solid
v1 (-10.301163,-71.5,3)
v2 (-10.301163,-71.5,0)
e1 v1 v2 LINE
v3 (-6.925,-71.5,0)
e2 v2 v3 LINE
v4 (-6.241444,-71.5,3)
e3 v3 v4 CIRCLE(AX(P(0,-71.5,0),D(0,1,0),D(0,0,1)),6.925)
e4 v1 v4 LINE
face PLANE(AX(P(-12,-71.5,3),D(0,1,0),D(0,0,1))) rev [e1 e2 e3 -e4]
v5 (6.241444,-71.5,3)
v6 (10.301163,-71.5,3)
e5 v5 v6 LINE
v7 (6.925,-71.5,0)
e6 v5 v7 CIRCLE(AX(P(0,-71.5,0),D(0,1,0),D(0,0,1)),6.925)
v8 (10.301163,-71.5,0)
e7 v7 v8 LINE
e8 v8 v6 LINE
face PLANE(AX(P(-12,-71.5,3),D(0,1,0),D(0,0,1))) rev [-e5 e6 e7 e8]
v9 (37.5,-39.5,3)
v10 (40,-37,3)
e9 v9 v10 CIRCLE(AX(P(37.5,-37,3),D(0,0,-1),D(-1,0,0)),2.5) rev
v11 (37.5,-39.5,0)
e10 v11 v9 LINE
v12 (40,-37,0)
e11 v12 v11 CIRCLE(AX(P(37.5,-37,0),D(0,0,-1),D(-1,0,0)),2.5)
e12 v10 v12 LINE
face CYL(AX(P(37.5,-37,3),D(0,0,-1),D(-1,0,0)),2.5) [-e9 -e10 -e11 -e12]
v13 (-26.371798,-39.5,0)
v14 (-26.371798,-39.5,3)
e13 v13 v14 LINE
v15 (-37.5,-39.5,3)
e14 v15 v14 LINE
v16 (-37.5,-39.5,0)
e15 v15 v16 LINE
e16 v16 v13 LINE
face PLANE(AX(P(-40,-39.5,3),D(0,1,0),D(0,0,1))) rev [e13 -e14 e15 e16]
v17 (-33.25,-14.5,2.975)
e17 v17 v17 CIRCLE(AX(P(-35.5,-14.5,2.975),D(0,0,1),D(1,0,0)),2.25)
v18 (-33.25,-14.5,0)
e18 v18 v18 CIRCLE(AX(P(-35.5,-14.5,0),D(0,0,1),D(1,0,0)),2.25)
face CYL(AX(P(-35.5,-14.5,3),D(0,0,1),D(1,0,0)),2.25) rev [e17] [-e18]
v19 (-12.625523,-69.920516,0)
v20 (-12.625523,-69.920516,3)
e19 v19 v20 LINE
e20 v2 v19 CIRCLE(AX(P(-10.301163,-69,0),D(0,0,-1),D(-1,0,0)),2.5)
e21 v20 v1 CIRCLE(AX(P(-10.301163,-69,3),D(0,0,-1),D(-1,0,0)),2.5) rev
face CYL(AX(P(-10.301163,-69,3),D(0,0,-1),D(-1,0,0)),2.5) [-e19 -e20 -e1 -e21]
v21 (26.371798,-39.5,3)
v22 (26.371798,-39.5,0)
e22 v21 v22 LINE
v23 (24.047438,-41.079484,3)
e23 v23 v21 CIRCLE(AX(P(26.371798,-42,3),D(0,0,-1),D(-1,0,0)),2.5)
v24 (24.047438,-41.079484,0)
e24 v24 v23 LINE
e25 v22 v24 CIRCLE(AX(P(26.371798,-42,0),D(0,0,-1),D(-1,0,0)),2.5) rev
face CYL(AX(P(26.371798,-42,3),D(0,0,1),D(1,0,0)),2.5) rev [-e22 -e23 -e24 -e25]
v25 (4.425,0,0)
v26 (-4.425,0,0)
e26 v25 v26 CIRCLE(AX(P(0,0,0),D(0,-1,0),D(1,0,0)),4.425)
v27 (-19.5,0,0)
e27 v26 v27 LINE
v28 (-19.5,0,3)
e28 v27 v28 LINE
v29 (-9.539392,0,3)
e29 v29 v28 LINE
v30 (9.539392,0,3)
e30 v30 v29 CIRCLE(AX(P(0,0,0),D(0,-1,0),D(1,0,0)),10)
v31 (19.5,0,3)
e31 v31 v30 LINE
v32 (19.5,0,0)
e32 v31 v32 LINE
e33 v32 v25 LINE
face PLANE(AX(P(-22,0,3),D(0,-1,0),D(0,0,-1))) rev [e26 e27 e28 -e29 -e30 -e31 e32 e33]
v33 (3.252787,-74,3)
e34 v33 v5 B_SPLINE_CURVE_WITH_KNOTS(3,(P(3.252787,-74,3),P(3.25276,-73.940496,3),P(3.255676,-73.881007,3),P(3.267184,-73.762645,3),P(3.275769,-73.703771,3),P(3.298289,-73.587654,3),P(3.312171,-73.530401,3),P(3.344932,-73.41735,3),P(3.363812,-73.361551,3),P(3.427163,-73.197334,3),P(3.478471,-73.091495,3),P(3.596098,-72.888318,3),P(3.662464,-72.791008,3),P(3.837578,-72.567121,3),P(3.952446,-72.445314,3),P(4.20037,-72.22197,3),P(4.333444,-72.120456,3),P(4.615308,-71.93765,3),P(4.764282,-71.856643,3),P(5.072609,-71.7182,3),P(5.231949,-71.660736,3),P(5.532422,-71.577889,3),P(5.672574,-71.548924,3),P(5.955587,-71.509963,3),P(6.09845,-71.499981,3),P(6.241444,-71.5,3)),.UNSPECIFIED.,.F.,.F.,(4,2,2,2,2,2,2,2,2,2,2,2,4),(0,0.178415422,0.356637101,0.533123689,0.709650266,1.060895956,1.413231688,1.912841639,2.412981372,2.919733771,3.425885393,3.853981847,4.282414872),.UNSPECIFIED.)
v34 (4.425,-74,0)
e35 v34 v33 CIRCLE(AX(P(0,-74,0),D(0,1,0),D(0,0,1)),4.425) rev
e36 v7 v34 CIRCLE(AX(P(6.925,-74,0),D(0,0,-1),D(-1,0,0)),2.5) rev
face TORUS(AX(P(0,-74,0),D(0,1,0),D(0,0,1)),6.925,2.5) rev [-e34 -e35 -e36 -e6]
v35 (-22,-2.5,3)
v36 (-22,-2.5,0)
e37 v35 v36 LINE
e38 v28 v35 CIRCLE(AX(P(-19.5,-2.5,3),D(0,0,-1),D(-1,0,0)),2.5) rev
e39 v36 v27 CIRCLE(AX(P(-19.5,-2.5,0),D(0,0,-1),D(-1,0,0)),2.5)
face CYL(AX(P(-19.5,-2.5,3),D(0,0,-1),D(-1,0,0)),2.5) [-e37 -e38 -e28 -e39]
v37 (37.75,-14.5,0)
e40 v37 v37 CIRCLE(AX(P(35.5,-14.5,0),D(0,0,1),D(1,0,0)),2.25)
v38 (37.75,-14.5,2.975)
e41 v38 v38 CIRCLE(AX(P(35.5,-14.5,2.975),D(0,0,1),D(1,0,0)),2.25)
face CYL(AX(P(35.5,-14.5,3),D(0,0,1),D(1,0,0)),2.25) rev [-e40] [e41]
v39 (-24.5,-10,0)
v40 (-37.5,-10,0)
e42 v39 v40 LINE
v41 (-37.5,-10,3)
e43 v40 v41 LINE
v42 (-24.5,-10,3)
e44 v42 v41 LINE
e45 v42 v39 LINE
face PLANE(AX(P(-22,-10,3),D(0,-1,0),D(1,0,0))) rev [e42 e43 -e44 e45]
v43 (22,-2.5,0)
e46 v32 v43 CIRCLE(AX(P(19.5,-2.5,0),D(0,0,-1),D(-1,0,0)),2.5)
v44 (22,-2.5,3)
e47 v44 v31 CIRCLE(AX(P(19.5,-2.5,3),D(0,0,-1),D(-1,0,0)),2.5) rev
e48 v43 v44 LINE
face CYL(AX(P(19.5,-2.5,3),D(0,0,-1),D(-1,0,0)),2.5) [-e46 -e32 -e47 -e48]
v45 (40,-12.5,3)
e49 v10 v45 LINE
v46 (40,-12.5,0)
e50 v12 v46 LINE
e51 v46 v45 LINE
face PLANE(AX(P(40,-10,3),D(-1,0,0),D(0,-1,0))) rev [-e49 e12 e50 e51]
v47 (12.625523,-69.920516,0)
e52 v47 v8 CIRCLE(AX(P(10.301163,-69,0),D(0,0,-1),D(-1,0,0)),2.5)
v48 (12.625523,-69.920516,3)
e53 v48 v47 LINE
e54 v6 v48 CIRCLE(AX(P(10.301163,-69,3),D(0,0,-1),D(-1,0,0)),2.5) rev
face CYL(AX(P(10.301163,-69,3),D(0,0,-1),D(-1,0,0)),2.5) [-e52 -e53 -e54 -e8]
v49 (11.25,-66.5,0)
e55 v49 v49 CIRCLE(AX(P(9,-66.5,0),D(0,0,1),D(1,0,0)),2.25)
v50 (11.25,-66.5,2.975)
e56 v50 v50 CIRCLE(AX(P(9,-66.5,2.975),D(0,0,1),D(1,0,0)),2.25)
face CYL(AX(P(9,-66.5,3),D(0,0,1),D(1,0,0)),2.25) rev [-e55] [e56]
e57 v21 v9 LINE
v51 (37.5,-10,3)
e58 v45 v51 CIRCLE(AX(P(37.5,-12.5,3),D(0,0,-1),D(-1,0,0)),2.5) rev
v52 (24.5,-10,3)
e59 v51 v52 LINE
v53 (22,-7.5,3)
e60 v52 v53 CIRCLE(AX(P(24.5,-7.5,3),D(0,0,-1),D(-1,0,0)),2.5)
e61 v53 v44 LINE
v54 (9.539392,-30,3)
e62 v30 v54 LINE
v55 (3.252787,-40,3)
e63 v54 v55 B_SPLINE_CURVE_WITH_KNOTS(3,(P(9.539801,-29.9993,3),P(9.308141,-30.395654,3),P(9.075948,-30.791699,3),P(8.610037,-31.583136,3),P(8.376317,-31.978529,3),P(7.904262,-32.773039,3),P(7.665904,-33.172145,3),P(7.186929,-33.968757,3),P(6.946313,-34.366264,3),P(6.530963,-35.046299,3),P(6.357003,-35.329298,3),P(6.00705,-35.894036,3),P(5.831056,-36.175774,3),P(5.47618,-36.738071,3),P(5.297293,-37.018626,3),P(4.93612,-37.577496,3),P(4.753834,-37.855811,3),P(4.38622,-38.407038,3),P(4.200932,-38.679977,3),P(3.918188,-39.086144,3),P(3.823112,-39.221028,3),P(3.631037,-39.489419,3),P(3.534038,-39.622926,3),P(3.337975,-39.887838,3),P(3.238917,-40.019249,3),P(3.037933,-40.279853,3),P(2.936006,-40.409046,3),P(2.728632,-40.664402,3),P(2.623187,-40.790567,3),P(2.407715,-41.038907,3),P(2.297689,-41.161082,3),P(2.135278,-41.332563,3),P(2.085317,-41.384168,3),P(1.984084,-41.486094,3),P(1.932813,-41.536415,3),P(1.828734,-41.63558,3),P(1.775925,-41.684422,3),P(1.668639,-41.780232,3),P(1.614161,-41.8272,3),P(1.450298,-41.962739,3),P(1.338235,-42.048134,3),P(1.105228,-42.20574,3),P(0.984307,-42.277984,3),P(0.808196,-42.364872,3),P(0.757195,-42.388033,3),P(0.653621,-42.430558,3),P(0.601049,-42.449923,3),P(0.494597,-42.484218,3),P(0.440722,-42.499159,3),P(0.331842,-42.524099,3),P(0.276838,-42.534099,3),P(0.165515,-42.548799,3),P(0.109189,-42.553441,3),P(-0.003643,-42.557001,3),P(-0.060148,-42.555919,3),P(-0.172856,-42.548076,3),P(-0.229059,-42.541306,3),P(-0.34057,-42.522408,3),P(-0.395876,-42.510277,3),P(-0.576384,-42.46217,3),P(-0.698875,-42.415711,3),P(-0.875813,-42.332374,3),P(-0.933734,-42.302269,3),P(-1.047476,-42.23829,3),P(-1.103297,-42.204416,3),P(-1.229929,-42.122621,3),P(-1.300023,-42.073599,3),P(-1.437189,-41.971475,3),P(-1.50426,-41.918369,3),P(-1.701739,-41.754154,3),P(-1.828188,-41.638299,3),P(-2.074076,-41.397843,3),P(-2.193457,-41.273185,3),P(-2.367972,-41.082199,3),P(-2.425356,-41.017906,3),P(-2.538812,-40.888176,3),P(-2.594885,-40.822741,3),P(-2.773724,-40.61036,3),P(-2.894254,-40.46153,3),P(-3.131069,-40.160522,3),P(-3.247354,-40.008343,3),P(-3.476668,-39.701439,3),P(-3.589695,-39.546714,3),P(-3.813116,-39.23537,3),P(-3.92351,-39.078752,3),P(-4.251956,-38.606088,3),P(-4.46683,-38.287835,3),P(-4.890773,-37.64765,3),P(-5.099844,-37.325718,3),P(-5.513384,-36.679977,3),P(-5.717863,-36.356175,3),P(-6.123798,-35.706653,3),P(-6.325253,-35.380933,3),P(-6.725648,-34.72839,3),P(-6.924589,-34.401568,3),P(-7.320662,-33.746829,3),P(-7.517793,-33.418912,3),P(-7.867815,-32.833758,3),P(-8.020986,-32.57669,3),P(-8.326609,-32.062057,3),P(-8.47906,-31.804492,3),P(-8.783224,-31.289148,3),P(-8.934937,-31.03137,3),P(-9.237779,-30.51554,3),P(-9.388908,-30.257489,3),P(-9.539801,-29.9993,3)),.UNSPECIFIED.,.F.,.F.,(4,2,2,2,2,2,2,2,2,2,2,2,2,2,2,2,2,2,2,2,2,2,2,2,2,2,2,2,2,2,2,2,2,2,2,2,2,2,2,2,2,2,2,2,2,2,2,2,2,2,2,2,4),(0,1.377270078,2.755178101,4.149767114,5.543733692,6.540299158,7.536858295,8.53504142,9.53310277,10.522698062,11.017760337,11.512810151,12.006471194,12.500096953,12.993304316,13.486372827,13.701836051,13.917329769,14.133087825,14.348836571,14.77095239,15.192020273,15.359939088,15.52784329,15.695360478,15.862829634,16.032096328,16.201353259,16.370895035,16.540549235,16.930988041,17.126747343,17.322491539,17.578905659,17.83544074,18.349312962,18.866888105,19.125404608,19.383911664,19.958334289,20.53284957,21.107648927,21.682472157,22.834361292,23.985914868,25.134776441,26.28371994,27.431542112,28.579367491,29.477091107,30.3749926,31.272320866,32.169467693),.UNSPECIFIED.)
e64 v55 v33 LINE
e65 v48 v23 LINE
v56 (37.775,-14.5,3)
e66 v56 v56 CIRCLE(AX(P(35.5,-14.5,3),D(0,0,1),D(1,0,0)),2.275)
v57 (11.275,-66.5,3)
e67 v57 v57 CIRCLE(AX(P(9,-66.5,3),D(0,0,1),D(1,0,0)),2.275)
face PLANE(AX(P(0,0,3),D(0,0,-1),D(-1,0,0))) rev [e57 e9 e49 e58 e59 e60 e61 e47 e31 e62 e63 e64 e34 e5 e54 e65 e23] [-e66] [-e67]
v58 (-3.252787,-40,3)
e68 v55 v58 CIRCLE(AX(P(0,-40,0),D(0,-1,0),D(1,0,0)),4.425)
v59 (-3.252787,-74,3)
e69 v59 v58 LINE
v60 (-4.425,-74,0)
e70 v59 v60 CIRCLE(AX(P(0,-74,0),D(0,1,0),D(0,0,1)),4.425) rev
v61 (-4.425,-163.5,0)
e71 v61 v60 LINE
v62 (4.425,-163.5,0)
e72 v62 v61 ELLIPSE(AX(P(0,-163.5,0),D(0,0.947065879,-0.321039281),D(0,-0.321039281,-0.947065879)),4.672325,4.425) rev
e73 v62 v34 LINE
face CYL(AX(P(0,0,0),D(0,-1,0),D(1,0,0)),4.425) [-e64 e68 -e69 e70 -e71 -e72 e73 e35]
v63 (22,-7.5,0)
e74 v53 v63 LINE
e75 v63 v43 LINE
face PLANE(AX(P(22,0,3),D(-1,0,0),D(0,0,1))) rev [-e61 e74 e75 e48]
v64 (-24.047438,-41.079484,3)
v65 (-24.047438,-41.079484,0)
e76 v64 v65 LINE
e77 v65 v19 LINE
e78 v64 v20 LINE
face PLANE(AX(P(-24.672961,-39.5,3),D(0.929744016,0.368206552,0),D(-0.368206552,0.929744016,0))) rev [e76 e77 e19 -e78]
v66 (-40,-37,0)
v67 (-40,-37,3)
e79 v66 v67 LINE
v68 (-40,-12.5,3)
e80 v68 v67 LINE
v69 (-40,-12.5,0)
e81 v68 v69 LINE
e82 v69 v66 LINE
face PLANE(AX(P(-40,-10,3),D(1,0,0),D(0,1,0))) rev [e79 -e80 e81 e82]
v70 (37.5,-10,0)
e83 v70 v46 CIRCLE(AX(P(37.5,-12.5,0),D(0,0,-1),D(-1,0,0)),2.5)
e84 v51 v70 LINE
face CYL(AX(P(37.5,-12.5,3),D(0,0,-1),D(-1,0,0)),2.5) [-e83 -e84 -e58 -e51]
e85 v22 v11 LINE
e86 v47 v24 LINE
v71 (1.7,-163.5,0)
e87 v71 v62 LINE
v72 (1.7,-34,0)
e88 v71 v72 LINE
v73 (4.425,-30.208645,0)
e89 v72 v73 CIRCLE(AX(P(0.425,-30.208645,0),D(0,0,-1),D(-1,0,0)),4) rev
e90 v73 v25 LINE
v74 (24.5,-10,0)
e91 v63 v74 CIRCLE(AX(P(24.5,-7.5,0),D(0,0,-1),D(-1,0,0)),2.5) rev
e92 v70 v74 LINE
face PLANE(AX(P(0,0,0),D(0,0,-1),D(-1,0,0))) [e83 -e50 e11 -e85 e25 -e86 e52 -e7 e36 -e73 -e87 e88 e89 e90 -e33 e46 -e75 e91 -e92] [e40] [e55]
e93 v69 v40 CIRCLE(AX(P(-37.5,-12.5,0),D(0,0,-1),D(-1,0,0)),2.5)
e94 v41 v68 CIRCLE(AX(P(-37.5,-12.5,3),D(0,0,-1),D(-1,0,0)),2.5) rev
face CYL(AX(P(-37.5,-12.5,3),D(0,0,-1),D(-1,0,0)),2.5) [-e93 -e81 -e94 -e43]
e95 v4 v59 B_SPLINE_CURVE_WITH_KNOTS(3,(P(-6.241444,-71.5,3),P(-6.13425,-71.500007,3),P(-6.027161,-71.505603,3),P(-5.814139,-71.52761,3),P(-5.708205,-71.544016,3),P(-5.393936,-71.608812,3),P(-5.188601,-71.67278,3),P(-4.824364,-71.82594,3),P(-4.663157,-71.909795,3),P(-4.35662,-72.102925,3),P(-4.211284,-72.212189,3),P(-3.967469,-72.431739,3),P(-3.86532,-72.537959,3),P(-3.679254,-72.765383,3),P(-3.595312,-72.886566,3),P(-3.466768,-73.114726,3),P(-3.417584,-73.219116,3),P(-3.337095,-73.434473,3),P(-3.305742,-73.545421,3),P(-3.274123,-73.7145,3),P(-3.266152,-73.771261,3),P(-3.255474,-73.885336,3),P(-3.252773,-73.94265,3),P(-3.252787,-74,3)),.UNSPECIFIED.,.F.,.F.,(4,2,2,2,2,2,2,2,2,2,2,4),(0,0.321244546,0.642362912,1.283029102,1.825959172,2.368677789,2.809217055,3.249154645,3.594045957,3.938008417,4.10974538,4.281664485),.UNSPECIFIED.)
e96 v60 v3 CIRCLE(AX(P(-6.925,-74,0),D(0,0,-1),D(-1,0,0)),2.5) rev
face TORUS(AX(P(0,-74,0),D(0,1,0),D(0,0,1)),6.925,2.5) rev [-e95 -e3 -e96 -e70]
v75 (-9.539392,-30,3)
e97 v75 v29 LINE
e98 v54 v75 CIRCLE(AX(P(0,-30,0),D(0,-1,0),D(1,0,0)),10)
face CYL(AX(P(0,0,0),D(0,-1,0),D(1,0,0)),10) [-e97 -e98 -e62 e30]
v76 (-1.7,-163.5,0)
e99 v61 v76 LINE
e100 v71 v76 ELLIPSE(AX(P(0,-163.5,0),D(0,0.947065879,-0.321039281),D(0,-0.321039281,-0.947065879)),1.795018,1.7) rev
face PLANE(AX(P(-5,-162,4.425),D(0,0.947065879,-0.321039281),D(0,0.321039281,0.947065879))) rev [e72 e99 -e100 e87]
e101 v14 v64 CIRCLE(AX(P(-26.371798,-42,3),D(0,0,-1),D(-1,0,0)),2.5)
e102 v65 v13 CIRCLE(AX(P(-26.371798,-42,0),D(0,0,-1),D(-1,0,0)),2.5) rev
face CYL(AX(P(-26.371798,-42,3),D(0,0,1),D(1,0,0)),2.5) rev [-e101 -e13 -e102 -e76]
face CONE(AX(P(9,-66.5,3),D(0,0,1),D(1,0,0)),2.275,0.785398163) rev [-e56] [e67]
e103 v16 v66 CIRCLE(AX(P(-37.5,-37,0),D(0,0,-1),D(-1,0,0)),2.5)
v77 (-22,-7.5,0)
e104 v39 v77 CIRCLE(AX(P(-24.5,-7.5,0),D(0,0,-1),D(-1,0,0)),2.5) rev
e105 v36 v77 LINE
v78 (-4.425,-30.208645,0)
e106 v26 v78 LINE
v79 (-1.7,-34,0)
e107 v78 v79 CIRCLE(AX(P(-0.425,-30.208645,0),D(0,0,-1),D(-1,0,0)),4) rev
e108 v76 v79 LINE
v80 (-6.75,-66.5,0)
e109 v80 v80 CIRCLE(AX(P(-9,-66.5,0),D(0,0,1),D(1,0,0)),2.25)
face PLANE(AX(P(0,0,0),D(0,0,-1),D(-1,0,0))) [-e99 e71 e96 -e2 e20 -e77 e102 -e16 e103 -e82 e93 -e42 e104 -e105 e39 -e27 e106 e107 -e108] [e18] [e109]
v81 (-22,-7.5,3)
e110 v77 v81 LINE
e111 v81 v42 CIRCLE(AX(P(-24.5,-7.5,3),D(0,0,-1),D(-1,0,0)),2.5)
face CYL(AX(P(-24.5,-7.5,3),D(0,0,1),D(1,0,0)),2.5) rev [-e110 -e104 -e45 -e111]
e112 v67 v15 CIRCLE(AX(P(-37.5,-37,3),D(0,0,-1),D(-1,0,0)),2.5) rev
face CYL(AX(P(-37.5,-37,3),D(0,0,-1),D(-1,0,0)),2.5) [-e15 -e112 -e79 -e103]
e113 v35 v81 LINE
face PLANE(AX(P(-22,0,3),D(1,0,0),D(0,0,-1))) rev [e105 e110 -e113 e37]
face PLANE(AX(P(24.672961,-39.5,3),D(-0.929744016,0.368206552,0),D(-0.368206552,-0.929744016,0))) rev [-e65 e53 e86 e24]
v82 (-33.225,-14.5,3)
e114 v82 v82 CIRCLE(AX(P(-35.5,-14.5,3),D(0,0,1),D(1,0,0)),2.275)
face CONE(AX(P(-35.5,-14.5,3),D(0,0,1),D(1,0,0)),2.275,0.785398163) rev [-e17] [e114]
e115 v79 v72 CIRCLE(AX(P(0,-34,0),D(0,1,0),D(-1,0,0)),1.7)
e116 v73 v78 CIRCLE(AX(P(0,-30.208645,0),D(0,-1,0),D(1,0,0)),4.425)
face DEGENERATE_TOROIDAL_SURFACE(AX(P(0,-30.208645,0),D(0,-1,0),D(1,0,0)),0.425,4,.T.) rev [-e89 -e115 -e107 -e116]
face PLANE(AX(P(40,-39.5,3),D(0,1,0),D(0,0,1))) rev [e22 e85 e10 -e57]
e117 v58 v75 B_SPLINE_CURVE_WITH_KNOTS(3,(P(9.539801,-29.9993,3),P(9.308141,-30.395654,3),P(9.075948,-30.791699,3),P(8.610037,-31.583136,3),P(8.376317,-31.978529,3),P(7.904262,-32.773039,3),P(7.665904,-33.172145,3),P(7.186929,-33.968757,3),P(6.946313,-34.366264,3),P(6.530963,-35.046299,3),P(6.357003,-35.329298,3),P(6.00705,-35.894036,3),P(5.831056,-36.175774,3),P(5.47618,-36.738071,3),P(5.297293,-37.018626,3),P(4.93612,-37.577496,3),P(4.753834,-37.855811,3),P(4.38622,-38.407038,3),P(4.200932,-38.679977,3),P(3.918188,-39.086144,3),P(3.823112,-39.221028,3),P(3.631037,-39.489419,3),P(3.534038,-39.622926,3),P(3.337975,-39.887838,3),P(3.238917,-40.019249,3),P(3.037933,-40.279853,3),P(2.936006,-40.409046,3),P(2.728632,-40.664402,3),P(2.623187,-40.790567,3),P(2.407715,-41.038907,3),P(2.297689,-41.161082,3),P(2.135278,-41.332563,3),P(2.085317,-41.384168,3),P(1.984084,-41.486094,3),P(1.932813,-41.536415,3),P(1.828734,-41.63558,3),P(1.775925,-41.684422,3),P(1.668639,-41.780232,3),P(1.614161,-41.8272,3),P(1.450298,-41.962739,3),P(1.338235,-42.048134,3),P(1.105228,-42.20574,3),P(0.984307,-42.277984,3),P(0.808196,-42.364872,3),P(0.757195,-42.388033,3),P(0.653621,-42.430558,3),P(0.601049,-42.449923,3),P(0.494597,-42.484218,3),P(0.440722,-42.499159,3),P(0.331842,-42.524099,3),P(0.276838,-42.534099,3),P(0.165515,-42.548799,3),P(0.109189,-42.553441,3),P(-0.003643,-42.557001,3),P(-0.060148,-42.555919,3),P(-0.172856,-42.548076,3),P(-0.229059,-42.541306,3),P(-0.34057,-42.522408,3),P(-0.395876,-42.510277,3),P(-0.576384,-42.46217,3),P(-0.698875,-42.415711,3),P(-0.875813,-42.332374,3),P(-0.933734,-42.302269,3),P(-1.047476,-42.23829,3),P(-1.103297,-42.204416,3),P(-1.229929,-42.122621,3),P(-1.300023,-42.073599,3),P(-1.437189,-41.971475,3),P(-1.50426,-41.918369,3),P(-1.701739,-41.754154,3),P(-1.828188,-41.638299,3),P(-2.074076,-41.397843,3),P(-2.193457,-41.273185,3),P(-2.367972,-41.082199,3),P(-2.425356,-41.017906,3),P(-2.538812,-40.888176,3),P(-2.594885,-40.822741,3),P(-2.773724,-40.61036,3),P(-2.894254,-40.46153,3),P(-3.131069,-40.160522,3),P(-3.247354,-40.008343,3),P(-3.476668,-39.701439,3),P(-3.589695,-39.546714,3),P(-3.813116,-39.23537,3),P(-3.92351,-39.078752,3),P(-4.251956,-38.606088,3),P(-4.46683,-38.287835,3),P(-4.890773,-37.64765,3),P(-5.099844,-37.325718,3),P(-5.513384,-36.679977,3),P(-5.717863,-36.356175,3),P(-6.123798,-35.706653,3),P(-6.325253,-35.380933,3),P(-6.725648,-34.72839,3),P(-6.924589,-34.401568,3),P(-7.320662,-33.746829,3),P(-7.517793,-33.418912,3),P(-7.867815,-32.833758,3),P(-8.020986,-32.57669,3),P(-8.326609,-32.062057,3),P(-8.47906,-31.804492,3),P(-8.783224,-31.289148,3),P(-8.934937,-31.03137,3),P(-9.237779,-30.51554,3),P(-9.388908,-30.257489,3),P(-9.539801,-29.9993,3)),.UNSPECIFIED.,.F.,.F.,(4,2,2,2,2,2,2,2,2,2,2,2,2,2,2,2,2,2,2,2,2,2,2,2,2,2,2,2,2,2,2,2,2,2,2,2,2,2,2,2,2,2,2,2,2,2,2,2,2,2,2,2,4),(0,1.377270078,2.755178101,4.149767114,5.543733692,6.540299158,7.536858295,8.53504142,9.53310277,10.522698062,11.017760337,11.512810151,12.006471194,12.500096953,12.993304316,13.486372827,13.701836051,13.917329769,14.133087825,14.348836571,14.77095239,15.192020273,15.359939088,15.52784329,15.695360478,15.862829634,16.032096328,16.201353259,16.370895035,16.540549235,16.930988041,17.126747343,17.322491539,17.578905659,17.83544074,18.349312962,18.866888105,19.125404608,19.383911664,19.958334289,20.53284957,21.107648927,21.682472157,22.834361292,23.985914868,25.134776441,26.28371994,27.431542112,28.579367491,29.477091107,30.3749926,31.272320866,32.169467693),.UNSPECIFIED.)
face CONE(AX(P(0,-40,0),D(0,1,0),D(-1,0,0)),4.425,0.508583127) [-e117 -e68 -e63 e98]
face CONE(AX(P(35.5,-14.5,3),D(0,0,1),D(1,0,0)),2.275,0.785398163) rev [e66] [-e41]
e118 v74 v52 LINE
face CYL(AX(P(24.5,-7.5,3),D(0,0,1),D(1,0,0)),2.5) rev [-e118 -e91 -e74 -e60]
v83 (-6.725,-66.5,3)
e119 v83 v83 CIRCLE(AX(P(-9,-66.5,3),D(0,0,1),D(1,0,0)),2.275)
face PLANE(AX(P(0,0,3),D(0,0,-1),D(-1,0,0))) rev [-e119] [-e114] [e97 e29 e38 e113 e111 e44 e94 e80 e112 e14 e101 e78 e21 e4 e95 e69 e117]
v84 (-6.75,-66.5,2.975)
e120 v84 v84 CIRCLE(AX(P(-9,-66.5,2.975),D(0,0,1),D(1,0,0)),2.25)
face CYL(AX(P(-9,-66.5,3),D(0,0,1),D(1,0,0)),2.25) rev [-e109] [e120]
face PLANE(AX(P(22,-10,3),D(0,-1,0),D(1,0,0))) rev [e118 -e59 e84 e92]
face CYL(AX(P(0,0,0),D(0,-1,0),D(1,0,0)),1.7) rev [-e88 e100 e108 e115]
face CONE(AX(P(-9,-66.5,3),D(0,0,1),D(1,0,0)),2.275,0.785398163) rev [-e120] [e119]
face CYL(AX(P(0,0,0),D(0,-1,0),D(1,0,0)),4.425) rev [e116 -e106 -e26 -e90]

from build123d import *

# Parameters (mm, degrees)
BOSS_EXTRUDE1_DEPTH            = 3
SKETCH2_W                      = 2.725
SKETCH2_H                      = 93.5
REVOLVE1_ANGLE                 = 180
SKETCH2_3_W                    = 1.7
SKETCH2_3_H                    = 93.5
M4_CLEARANCE_HOLE1_D           = 4.5
M4_CLEARANCE_HOLE1_CSINK_D     = 4.55
M4_CLEARANCE_HOLE1_CSINK_ANGLE = 90
FILLET1_R                      = 4
FILLET2_R                      = 2.5
CUT_EXTRUDE2_DEPTH             = 5


with BuildPart() as part:
    # Sketch1 → Boss-Extrude1 (new body)
    with BuildSketch(Plane.XY):
        Polygon((-22, 0), (22, 0), (22, -10), (40, -10), (40, -39.5), (24.672961021, -39.5), (12, -71.5), (-12, -71.5), (-24.672961021, -39.5), (-40, -39.5), (-40, -10), (-22, -10), align=None)
    extrude(amount=BOSS_EXTRUDE1_DEPTH)

    # Sketch2 → Revolve1 (revolve)
    with BuildSketch(Plane.XY):
        with Locations((-3.0625, -118.25)):
            Rectangle(SKETCH2_W, SKETCH2_H)
        Polygon((-4.425, -40), (-4.425, -71.5), (-1.7, -71.5), (-1.7, -34), (-4.425, -34), (-4.425, 0), (-10, 0), (-10, -30), align=None)
    revolve(axis=Axis((0, 0, 0), (0, 1, 0)), revolution_arc=REVOLVE1_ANGLE)

    # Sketch2<3> → Cut-Revolve1 (revolve, cut)
    with BuildSketch(Plane.XY):
        with Locations((-0.85, -118.25)):
            Rectangle(SKETCH2_3_W, SKETCH2_3_H)
        Polygon((-1.7, -34), (-1.7, -71.5), (0, -71.5), (0, 0), (-4.425, 0), (-4.425, -34), align=None)
    revolve(axis=Axis((0, 0, 0), (0, -1, 0)), mode=Mode.SUBTRACT)

    # M4 Clearance Hole1 (through all)
    with Locations(Plane.XY.offset(3)):
        with Locations((-35.5, -14.5), (-9, -66.5), (9, -66.5), (35.5, -14.5)):
            CounterSinkHole(M4_CLEARANCE_HOLE1_D / 2, M4_CLEARANCE_HOLE1_CSINK_D / 2, counter_sink_angle=M4_CLEARANCE_HOLE1_CSINK_ANGLE)

    # Fillet1
    # the kernel refuses this fillet: 4 mm, written as the material it adds along each edge
    with BuildSketch(Plane(origin=(0, -34, 0), x_dir=(1, 0, 0), z_dir=(0, 0, -1))) as fillet1_piece_1:
        with BuildLine():
            CenterArc((0.425, -3.791355299), FILLET1_R, 0, 71.412652979)
            Line((1.7, 0), (1.7255, 0.075827106))
            ThreePointArc((1.7255, 0.075827106), (3.0625, 0.08), (4.425, 0.08))
            Line((4.425, 0.08), (4.505, 0))
            Line((4.505, 0), (4.505, -3.791355299))
            Line((4.505, -3.791355299), (4.425, -3.791355299))
        make_face()
    revolve(axis=Axis((0, -34, 0), (0, -1, 0)), revolution_arc=180)

    # Fillet2
    fillet2_edges = [part.edges().sort_by_distance(p)[0] for p in [
        (-22, 0, 1.5),
        (22, 0, 1.5),
        (22, -10, 1.5),
        (40, -10, 1.5),
        (40, -39.5, 1.5),
        (24.672961021, -39.5, 1.5),
        (12, -71.5, 1.5),
        (-12, -71.5, 1.5),
        (-24.672961021, -39.5, 1.5),
        (-40, -39.5, 1.5),
        (-40, -10, 1.5),
        (-22, -10, 1.5),
        (4.121541499, -71.5, 1.610441142),
        (-4.121541499, -71.5, 1.610441142),
    ]]
    fillet(fillet2_edges, radius=FILLET2_R)

    # Sketch9 → Cut-Extrude2 (cut, symmetric)
    with BuildSketch(Plane(origin=(0, 0, 0), x_dir=(0, 0, -1), z_dir=(1, 0, 0))):
        Polygon((-4.425, -162), (4.425, -165), (-4.425, -165), align=None)
    extrude(amount=CUT_EXTRUDE2_DEPTH, both=True, mode=Mode.SUBTRACT)


solid = part.part
